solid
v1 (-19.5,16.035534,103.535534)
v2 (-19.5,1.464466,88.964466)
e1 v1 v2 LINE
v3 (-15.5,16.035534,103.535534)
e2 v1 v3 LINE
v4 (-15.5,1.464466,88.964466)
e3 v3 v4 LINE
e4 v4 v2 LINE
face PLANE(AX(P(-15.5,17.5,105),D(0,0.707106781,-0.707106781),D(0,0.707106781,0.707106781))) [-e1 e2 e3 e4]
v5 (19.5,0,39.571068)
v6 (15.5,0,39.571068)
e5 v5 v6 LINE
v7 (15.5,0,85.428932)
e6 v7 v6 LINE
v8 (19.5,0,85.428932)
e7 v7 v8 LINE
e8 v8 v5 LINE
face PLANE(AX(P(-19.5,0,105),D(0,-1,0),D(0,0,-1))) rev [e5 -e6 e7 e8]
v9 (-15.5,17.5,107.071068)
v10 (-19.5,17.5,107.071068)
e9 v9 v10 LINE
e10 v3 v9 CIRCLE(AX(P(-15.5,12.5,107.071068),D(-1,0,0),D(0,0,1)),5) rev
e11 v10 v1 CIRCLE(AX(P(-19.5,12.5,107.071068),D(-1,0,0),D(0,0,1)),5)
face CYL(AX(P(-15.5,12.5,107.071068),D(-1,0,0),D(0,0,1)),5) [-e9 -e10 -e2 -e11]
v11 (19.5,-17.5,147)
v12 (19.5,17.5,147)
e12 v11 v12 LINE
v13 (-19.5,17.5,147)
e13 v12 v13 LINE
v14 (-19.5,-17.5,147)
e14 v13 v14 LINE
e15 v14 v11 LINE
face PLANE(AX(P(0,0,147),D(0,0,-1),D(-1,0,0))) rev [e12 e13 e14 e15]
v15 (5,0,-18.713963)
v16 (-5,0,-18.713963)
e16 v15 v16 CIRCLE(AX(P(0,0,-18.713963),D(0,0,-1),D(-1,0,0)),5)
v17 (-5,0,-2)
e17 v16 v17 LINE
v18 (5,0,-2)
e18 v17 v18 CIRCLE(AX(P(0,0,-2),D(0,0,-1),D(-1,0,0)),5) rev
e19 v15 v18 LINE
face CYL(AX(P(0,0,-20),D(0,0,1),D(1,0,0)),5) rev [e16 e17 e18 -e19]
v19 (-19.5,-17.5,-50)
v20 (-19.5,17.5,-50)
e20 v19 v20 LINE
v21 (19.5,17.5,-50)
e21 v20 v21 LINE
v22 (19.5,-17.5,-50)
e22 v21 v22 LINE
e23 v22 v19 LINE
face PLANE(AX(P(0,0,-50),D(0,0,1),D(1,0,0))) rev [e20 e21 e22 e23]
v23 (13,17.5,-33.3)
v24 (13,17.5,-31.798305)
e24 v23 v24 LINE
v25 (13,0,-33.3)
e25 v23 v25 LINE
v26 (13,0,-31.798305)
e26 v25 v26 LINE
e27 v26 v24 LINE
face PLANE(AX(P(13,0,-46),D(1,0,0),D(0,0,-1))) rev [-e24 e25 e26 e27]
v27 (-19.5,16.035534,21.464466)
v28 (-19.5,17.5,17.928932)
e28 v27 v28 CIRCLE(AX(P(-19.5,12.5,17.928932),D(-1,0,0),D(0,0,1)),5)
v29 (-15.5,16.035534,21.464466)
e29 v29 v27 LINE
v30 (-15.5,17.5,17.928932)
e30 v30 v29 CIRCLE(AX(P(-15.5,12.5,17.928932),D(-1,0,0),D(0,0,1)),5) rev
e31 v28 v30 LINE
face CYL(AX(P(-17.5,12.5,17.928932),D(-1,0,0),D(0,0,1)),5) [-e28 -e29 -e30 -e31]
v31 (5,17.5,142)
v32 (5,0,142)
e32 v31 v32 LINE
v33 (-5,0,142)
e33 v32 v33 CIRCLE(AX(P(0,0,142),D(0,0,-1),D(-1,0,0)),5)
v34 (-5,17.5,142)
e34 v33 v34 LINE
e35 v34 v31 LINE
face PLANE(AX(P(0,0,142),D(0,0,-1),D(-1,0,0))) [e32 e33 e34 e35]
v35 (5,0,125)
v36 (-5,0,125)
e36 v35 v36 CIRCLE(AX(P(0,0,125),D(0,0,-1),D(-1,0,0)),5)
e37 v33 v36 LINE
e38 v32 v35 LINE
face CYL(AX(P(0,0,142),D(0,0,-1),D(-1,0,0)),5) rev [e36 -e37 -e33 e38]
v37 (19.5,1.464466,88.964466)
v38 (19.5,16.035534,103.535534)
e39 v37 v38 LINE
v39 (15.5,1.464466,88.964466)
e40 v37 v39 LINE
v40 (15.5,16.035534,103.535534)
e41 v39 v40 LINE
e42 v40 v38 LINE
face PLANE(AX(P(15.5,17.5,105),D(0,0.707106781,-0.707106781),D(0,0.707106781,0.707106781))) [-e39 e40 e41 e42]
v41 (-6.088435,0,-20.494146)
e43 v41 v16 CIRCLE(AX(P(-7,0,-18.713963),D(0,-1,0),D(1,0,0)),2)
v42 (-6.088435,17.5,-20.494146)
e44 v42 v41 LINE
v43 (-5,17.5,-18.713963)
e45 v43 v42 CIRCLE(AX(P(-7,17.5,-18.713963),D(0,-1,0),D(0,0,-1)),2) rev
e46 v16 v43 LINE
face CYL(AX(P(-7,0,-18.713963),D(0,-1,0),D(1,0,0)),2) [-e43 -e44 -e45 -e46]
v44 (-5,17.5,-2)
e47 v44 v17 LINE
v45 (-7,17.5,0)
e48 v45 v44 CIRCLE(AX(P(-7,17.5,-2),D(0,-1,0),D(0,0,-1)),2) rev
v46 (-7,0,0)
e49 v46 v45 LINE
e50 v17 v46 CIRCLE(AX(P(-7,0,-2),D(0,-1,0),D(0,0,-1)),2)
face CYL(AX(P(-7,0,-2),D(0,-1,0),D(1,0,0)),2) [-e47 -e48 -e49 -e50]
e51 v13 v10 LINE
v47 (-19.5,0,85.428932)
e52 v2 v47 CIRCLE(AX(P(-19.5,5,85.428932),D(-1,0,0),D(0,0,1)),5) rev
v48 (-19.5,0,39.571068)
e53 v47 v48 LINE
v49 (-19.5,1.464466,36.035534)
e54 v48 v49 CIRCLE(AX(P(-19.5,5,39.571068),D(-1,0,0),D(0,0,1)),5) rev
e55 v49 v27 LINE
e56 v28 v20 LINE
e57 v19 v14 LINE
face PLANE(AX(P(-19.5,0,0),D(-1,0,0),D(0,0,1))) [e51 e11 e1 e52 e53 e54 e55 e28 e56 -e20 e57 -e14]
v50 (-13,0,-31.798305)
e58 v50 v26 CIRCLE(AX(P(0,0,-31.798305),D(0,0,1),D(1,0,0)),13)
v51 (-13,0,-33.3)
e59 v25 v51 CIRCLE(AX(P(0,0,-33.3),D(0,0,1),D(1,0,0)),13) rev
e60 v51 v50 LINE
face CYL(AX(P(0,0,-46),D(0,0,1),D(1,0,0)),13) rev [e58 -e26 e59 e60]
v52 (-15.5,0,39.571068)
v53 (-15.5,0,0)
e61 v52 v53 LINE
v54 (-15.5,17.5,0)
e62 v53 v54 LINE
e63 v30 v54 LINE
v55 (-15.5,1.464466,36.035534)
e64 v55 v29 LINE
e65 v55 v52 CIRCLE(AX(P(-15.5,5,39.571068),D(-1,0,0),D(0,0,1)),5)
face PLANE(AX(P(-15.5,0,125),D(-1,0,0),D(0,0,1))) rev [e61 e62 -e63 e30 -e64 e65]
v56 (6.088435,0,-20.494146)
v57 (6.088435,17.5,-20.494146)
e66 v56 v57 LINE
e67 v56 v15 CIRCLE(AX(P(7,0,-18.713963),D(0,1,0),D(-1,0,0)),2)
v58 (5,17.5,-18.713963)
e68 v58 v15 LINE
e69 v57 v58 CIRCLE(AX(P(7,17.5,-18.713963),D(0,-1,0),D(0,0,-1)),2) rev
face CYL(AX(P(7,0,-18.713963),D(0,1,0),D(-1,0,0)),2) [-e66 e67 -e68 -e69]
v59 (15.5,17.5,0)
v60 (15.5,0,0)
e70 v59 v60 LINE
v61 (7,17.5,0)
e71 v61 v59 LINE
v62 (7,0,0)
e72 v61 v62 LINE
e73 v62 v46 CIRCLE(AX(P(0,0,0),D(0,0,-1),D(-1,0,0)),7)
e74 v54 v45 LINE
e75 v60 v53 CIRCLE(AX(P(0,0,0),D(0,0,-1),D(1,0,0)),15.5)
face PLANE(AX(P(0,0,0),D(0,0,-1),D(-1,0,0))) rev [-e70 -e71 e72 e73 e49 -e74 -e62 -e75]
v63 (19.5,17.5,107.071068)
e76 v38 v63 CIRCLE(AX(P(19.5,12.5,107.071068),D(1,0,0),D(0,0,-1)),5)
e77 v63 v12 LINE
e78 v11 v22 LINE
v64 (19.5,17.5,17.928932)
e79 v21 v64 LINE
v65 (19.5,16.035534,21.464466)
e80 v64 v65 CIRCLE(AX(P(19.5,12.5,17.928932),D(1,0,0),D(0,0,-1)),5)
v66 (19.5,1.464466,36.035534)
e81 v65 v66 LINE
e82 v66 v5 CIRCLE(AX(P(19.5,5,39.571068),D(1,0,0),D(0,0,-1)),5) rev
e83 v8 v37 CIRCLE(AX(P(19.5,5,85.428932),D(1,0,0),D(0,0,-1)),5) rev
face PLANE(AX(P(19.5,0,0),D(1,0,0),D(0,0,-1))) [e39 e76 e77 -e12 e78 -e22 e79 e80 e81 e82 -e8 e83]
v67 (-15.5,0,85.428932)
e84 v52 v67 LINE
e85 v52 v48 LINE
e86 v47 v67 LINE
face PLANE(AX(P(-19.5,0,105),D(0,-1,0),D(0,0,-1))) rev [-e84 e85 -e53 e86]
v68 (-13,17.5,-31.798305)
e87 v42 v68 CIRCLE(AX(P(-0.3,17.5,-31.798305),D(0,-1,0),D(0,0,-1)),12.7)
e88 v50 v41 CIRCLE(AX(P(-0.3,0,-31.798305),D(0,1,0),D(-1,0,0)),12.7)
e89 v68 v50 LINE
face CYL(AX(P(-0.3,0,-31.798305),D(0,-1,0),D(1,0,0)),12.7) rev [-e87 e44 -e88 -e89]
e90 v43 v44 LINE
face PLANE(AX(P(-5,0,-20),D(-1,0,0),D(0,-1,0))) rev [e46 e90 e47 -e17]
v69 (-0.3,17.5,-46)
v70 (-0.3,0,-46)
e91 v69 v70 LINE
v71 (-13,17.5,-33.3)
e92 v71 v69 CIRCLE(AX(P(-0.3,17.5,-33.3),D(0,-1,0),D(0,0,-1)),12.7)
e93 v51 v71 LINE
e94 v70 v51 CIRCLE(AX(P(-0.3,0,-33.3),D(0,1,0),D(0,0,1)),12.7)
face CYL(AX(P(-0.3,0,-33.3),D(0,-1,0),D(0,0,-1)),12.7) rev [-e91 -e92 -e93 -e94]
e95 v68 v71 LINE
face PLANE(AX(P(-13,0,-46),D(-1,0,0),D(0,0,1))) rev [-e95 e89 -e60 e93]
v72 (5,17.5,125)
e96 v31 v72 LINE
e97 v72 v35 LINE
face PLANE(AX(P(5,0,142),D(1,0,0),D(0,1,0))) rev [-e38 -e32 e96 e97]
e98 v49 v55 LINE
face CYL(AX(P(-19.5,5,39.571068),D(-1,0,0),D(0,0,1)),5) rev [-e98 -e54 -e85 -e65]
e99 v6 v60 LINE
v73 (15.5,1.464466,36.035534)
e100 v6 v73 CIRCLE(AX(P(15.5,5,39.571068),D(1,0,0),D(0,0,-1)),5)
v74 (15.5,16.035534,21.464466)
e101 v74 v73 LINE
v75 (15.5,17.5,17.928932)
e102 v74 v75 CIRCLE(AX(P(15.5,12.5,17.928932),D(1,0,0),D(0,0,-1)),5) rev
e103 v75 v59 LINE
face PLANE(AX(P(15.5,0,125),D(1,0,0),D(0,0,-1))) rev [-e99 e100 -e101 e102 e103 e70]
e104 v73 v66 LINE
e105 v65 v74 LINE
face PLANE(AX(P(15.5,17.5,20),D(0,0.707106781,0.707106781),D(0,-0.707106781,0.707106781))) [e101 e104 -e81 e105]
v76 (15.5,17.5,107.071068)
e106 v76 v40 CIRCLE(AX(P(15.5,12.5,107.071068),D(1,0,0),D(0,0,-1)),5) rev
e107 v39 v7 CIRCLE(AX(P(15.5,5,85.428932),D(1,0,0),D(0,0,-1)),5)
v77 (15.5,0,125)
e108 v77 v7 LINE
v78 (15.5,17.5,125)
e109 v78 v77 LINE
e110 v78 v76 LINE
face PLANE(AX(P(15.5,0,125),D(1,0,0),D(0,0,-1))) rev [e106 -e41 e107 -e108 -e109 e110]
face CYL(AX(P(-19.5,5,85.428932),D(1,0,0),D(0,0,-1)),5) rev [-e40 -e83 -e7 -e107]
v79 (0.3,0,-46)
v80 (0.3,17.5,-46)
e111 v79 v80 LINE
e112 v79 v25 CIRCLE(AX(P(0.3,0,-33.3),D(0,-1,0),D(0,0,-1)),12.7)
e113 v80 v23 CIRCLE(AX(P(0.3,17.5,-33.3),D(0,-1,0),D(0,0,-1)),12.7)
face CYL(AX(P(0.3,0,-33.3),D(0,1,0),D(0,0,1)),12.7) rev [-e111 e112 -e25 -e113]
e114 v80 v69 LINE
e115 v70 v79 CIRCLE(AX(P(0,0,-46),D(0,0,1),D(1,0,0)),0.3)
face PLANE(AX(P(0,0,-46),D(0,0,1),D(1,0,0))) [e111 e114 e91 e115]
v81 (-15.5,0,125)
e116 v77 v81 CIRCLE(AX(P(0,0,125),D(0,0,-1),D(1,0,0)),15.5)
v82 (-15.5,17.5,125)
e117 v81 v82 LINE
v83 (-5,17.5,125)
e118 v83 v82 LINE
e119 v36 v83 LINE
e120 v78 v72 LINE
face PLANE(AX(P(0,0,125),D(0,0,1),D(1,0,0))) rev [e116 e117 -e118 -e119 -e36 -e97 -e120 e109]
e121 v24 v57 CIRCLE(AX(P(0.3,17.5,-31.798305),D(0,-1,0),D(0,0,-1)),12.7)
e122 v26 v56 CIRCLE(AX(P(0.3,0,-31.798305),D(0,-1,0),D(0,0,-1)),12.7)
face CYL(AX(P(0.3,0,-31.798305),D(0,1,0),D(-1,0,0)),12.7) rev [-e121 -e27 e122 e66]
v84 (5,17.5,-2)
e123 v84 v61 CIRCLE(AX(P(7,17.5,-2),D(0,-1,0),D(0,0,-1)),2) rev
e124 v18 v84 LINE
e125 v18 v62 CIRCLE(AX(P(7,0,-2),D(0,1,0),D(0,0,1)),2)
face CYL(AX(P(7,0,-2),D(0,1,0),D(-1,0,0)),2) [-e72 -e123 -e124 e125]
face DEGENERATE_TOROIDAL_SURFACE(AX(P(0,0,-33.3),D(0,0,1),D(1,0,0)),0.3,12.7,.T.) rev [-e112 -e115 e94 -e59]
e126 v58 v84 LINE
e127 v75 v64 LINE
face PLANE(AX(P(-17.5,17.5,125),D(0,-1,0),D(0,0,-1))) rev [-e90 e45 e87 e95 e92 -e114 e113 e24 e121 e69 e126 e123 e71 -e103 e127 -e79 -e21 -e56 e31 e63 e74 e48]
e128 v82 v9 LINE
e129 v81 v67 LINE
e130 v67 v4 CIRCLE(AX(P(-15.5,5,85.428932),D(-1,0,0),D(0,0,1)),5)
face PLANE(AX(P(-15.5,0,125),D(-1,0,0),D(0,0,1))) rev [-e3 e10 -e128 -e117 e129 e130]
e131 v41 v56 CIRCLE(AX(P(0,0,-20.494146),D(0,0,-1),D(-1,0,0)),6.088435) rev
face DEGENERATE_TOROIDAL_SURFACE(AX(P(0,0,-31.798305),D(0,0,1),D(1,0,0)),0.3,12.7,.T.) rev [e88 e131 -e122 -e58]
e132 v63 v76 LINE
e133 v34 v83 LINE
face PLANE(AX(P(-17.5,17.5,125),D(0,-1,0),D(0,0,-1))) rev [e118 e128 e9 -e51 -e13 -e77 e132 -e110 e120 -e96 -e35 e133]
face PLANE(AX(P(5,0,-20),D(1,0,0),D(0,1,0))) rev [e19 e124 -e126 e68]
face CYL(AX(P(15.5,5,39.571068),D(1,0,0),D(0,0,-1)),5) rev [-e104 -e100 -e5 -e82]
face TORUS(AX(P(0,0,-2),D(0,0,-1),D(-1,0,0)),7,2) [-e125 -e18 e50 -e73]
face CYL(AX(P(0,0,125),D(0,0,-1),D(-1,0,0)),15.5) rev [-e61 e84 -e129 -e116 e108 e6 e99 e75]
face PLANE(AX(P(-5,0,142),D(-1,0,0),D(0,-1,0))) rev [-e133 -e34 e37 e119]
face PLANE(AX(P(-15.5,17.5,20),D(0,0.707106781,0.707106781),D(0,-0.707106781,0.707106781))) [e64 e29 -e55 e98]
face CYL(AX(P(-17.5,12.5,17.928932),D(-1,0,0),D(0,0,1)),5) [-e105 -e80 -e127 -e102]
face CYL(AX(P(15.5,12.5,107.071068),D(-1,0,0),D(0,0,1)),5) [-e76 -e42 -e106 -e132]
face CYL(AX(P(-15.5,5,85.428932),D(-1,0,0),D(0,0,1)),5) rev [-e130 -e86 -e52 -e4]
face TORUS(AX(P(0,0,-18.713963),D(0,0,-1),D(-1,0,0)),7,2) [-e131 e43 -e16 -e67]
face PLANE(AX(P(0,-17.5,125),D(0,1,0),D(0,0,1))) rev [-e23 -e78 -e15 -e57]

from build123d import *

# Parameters (mm, degrees)
BOSS_EXTRUDE3_DEPTH  = 125
SKETCH4_W            = 35
SKETCH4_H            = 35
BOSS_EXTRUDE4_DEPTH  = 20
CUT_EXTRUDE2_DEPTH   = 17
SKETCH6_W            = 35
SKETCH6_H            = 35
BOSS_EXTRUDE5_DEPTH  = 48
CUT_EXTRUDE3_START   = -20
CUT_EXTRUDE3_DEPTH   = 20
CUT_EXTRUDE4_DEPTH   = 26
FILLET1_R            = 12.7
FILLET2_R            = 2
SKETCH9_W            = 193
SKETCH9_H            = 35
BOSS_EXTRUDE6_DEPTH  = 2
SKETCH10_W           = 193
SKETCH10_H           = 35
BOSS_EXTRUDE7_DEPTH  = 2
SKETCH11_W           = 39
SKETCH11_H           = 35
BOSS_EXTRUDE8_DEPTH  = 2
SKETCH12_W           = 39
SKETCH12_H           = 35
BOSS_EXTRUDE9_DEPTH  = 2
SKETCH13_W           = 85
SKETCH13_H           = 17.5
CUT_EXTRUDE5_DEPTH   = 154.089026398
BOSS_EXTRUDE10_DEPTH = 4
BOSS_EXTRUDE11_DEPTH = 4
FILLET3_START        = -20
FILLET3_DEPTH        = 40
FILLET3_START_2      = -19.5
FILLET3_2_DEPTH      = 4
FILLET3_START_3      = 15.5
FILLET3_3_DEPTH      = 4


with BuildPart() as part:
    # Sketch1 → Boss-Extrude3 (new body)
    with BuildSketch(Plane.XY):
        with BuildLine():
            Line((0, -17.5), (-17.5, -17.5))
            Line((-17.5, -17.5), (-17.5, 0))
            Line((-17.5, 0), (-17.5, 17.5))
            Line((-17.5, 17.5), (-15.5, 17.5))
            Line((-15.5, 17.5), (-15.5, 0))
            ThreePointArc((-15.5, 0), (0, -15.5), (15.5, 0))
            Line((15.5, 0), (15.5, 17.5))
            Line((15.5, 17.5), (17.5, 17.5))
            Line((17.5, 17.5), (17.5, 0))
            Line((17.5, 0), (17.5, -17.5))
            Line((17.5, -17.5), (0, -17.5))
        make_face()
    extrude(amount=BOSS_EXTRUDE3_DEPTH)

    # Sketch4 → Boss-Extrude4 (add)
    with BuildSketch(Plane.XY.offset(125)):
        Rectangle(SKETCH4_W, SKETCH4_H)
    extrude(amount=BOSS_EXTRUDE4_DEPTH)

    # Sketch5 → Cut-Extrude2 (cut)
    with BuildSketch(Plane(origin=(0, 0, 125), x_dir=(-1, 0, 0), z_dir=(0, 0, -1))):
        with BuildLine():
            Line((-5, 0), (-5, 17.5))
            Line((-5, 17.5), (5, 17.5))
            Line((5, 17.5), (5, 0))
            ThreePointArc((5, 0), (0, -5), (-5, 0))
        make_face()
    extrude(amount=-CUT_EXTRUDE2_DEPTH, mode=Mode.SUBTRACT)

    # Sketch6 → Boss-Extrude5 (add)
    with BuildSketch(Plane(origin=(0, 0, 0), x_dir=(-1, 0, 0), z_dir=(0, 0, -1))):
        Rectangle(SKETCH6_W, SKETCH6_H)
    extrude(amount=BOSS_EXTRUDE5_DEPTH)

    # Sketch7 → Cut-Extrude3 (cut)
    with BuildSketch(Plane.XY.offset(CUT_EXTRUDE3_START)):
        with BuildLine():
            Line((-5, 0), (-5, 17.5))
            Line((-5, 17.5), (5, 17.5))
            Line((5, 17.5), (5, 0))
            ThreePointArc((5, 0), (0, -5), (-5, 0))
        make_face()
    extrude(amount=CUT_EXTRUDE3_DEPTH, mode=Mode.SUBTRACT)

    # Sketch8 → Cut-Extrude4 (cut)
    with BuildSketch(Plane.XY.offset(-20)):
        with BuildLine():
            Line((-13, 0), (-13, 27.339362416))
            Line((-13, 27.339362416), (13, 27.339362416))
            Line((13, 27.339362416), (13, 0))
            ThreePointArc((13, 0), (0, -13), (-13, 0))
        make_face()
    extrude(amount=-CUT_EXTRUDE4_DEPTH, mode=Mode.SUBTRACT)

    # Fillet1
    # the kernel refuses this fillet: 12.7 mm, written as the material it adds along each edge
    with BuildSketch(Plane(origin=(13, 17.5, -20), x_dir=(-1, 0, 0), z_dir=(0, -1, 0)), Plane(origin=(-13, 0, -20), x_dir=(1, 0, 0), z_dir=(0, 1, 0))) as fillet1_piece_1:
        with BuildLine():
            CenterArc((12.7, 11.798304963), FILLET1_R, 180, 68.279526527)
            Line((0, 11.798304963), (-0.254, 11.798304963))
            Line((-0.254, 11.798304963), (-0.254, 0))
            Line((-0.254, 0), (0, -0.254))
            ThreePointArc((0, -0.254), (4, -0.254), (7.906, -0.235966099))
            Line((7.906, -0.235966099), (8, 0))
        make_face()
    extrude(amount=17.5)
    with BuildSketch(Plane(origin=(0, 0, -20), x_dir=(1, 0, 0), z_dir=(0, 1, 0))) as fillet1_piece_2:
        with BuildLine():
            CenterArc((0.3, 11.798304963), FILLET1_R, 291.720473473, 68.279526527)
            Line((13, 11.798304963), (13.254, 11.798304963))
            Line((13.254, 11.798304963), (13.254, 0))
            Line((13.254, 0), (13, -0.254))
            ThreePointArc((13, -0.254), (9, -0.254), (5.094, -0.235966099))
            Line((5.094, -0.235966099), (5, 0))
        make_face()
    revolve(axis=Axis((0, 0, -20), (0, 0, -1)), revolution_arc=180)
    with BuildSketch(Plane(origin=(13, 17.5, -46), x_dir=(0, 0, 1), z_dir=(0, -1, 0))) as fillet1_piece_3:
        with BuildLine():
            CenterArc((FILLET1_R, FILLET1_R), FILLET1_R, 180, 90)
            Line((0, FILLET1_R), (-FILLET1_R * 0.02, FILLET1_R))
            Line((-FILLET1_R * 0.02, FILLET1_R), (-FILLET1_R * 0.02, -FILLET1_R * 0.02))
            Line((-FILLET1_R * 0.02, -FILLET1_R * 0.02), (FILLET1_R, -FILLET1_R * 0.02))
            Line((FILLET1_R, -FILLET1_R * 0.02), (FILLET1_R, 0))
        make_face()
    extrude(amount=17.5)
    with BuildSketch(Plane(origin=(0, 0, -46), x_dir=(1, 0, 0), z_dir=(0, 1, 0))) as fillet1_piece_4:
        with BuildLine():
            CenterArc((13 - FILLET1_R, -FILLET1_R), FILLET1_R, 0, 90)
            Line((13, -FILLET1_R), (13 + FILLET1_R * 0.02, -FILLET1_R))
            Line((13 + FILLET1_R * 0.02, -FILLET1_R), (13 + FILLET1_R * 0.02, FILLET1_R * 0.02))
            Line((13 + FILLET1_R * 0.02, FILLET1_R * 0.02), (13 - FILLET1_R, FILLET1_R * 0.02))
            Line((13 - FILLET1_R, FILLET1_R * 0.02), (13 - FILLET1_R, 0))
        make_face()
    revolve(axis=Axis((0, 0, -46), (0, 0, -1)), revolution_arc=180)
    with BuildSketch(Plane(origin=(-13, 0, -46), x_dir=(1, 0, 0), z_dir=(0, 1, 0))) as fillet1_piece_5:
        with BuildLine():
            CenterArc((FILLET1_R, -FILLET1_R), FILLET1_R, 90, 90)
            Line((0, -FILLET1_R), (-FILLET1_R * 0.02, -FILLET1_R))
            Line((-FILLET1_R * 0.02, -FILLET1_R), (-FILLET1_R * 0.02, FILLET1_R * 0.02))
            Line((-FILLET1_R * 0.02, FILLET1_R * 0.02), (FILLET1_R, FILLET1_R * 0.02))
            Line((FILLET1_R, FILLET1_R * 0.02), (FILLET1_R, 0))
        make_face()
    extrude(amount=17.5)

    # Fillet2
    fillet2_edges = [part.edges().sort_by_distance(p)[0] for p in [
        (0, -5, -20),
        (-5, 8.75, -20),
        (5, 8.75, -20),
        (0, -5, 0),
        (5, 8.75, 0),
        (-5, 8.75, 0),
    ]]
    fillet(fillet2_edges, radius=FILLET2_R)

    # Sketch9 → Boss-Extrude6 (add)
    with BuildSketch(Plane.ZY.offset(17.5)):
        with Locations((48.5, 0)):
            Rectangle(SKETCH9_W, SKETCH9_H)
    extrude(amount=BOSS_EXTRUDE6_DEPTH)

    # Sketch10 → Boss-Extrude7 (add)
    with BuildSketch(Plane(origin=(17.5, 0, 0), x_dir=(0, 0, -1), z_dir=(1, 0, 0))):
        with Locations((-48.5, 0)):
            Rectangle(SKETCH10_W, SKETCH10_H)
    extrude(amount=BOSS_EXTRUDE7_DEPTH)

    # Sketch11 → Boss-Extrude8 (add)
    with BuildSketch(Plane(origin=(0, 0, -48), x_dir=(-1, 0, 0), z_dir=(0, 0, -1))):
        Rectangle(SKETCH11_W, SKETCH11_H)
    extrude(amount=BOSS_EXTRUDE8_DEPTH)

    # Sketch12 → Boss-Extrude9 (add)
    with BuildSketch(Plane.XY.offset(145)):
        Rectangle(SKETCH12_W, SKETCH12_H)
    extrude(amount=BOSS_EXTRUDE9_DEPTH)

    # Sketch13 → Cut-Extrude5 (cut, through all)
    with BuildSketch(Plane(origin=(19.5, 0, 0), x_dir=(0, 0, -1), z_dir=(1, 0, 0))):
        with Locations((-62.5, 8.75)):
            Rectangle(SKETCH13_W, SKETCH13_H)
    extrude(amount=-CUT_EXTRUDE5_DEPTH, mode=Mode.SUBTRACT)

    # Sketch14 → Boss-Extrude10 (add)
    with BuildSketch(Plane(origin=(19.5, 0, 0), x_dir=(0, 0, -1), z_dir=(1, 0, 0))):
        Polygon((-105, 17.5), (-87.5, 0), (-105, 0), align=None)
        Polygon((-20, 0), (-20, 17.5), (-37.5, 0), align=None)
    extrude(amount=-BOSS_EXTRUDE10_DEPTH)

    # Sketch15 → Boss-Extrude11 (add)
    with BuildSketch(Plane.ZY.offset(19.5)):
        Polygon((20, 17.5), (37.5, 0), (20, 0), align=None)
        Polygon((105, 17.5), (87.5, 0), (105, 0), align=None)
    extrude(amount=-BOSS_EXTRUDE11_DEPTH)

    # Fillet3: read off the stored shape, not the designer's step
    # Fillet3 outline → Fillet3 (cut)
    with BuildSketch(Plane.YZ.offset(FILLET3_START)):
        with BuildLine():
            Line((17.5, 20), (16.035533906, 21.464466094))
            ThreePointArc((16.035533906, 21.464466094), (17.119397663, 19.84234935), (17.5, 17.928932188))
            Line((17.5, 17.928932188), (17.5, 20))
        make_face()
        with BuildLine():
            ThreePointArc((17.5, 107.071067812), (17.119397663, 105.15765065), (16.035533906, 103.535533906))
            Line((16.035533906, 103.535533906), (17.5, 105))
            Line((17.5, 105), (17.5, 107.071067812))
        make_face()
    extrude(amount=FILLET3_DEPTH, mode=Mode.SUBTRACT)

    # Fillet3 2 outline → Fillet3 2 (add)
    with BuildSketch(Plane.YZ.offset(FILLET3_START_2)):
        with BuildLine():
            Line((0, 87.5), (0, 85.428932188))
            ThreePointArc((0, 85.428932188), (0.380602337, 87.34234935), (1.464466094, 88.964466094))
            Line((1.464466094, 88.964466094), (0, 87.5))
        make_face()
        with BuildLine():
            Line((0, 37.5), (1.464466094, 36.035533906))
            ThreePointArc((1.464466094, 36.035533906), (0.380602337, 37.65765065), (0, 39.571067812))
            Line((0, 39.571067812), (0, 37.5))
        make_face()
    extrude(amount=FILLET3_2_DEPTH)

    # Fillet3 3 outline → Fillet3 3 (add)
    with BuildSketch(Plane.YZ.offset(FILLET3_START_3)):
        with BuildLine():
            Line((0, 87.5), (0, 85.428932188))
            ThreePointArc((0, 85.428932188), (0.380602337, 87.34234935), (1.464466094, 88.964466094))
            Line((1.464466094, 88.964466094), (0, 87.5))
        make_face()
        with BuildLine():
            Line((0, 37.5), (1.464466094, 36.035533906))
            ThreePointArc((1.464466094, 36.035533906), (0.380602337, 37.65765065), (0, 39.571067812))
            Line((0, 39.571067812), (0, 37.5))
        make_face()
    extrude(amount=FILLET3_3_DEPTH)


solid = part.part
